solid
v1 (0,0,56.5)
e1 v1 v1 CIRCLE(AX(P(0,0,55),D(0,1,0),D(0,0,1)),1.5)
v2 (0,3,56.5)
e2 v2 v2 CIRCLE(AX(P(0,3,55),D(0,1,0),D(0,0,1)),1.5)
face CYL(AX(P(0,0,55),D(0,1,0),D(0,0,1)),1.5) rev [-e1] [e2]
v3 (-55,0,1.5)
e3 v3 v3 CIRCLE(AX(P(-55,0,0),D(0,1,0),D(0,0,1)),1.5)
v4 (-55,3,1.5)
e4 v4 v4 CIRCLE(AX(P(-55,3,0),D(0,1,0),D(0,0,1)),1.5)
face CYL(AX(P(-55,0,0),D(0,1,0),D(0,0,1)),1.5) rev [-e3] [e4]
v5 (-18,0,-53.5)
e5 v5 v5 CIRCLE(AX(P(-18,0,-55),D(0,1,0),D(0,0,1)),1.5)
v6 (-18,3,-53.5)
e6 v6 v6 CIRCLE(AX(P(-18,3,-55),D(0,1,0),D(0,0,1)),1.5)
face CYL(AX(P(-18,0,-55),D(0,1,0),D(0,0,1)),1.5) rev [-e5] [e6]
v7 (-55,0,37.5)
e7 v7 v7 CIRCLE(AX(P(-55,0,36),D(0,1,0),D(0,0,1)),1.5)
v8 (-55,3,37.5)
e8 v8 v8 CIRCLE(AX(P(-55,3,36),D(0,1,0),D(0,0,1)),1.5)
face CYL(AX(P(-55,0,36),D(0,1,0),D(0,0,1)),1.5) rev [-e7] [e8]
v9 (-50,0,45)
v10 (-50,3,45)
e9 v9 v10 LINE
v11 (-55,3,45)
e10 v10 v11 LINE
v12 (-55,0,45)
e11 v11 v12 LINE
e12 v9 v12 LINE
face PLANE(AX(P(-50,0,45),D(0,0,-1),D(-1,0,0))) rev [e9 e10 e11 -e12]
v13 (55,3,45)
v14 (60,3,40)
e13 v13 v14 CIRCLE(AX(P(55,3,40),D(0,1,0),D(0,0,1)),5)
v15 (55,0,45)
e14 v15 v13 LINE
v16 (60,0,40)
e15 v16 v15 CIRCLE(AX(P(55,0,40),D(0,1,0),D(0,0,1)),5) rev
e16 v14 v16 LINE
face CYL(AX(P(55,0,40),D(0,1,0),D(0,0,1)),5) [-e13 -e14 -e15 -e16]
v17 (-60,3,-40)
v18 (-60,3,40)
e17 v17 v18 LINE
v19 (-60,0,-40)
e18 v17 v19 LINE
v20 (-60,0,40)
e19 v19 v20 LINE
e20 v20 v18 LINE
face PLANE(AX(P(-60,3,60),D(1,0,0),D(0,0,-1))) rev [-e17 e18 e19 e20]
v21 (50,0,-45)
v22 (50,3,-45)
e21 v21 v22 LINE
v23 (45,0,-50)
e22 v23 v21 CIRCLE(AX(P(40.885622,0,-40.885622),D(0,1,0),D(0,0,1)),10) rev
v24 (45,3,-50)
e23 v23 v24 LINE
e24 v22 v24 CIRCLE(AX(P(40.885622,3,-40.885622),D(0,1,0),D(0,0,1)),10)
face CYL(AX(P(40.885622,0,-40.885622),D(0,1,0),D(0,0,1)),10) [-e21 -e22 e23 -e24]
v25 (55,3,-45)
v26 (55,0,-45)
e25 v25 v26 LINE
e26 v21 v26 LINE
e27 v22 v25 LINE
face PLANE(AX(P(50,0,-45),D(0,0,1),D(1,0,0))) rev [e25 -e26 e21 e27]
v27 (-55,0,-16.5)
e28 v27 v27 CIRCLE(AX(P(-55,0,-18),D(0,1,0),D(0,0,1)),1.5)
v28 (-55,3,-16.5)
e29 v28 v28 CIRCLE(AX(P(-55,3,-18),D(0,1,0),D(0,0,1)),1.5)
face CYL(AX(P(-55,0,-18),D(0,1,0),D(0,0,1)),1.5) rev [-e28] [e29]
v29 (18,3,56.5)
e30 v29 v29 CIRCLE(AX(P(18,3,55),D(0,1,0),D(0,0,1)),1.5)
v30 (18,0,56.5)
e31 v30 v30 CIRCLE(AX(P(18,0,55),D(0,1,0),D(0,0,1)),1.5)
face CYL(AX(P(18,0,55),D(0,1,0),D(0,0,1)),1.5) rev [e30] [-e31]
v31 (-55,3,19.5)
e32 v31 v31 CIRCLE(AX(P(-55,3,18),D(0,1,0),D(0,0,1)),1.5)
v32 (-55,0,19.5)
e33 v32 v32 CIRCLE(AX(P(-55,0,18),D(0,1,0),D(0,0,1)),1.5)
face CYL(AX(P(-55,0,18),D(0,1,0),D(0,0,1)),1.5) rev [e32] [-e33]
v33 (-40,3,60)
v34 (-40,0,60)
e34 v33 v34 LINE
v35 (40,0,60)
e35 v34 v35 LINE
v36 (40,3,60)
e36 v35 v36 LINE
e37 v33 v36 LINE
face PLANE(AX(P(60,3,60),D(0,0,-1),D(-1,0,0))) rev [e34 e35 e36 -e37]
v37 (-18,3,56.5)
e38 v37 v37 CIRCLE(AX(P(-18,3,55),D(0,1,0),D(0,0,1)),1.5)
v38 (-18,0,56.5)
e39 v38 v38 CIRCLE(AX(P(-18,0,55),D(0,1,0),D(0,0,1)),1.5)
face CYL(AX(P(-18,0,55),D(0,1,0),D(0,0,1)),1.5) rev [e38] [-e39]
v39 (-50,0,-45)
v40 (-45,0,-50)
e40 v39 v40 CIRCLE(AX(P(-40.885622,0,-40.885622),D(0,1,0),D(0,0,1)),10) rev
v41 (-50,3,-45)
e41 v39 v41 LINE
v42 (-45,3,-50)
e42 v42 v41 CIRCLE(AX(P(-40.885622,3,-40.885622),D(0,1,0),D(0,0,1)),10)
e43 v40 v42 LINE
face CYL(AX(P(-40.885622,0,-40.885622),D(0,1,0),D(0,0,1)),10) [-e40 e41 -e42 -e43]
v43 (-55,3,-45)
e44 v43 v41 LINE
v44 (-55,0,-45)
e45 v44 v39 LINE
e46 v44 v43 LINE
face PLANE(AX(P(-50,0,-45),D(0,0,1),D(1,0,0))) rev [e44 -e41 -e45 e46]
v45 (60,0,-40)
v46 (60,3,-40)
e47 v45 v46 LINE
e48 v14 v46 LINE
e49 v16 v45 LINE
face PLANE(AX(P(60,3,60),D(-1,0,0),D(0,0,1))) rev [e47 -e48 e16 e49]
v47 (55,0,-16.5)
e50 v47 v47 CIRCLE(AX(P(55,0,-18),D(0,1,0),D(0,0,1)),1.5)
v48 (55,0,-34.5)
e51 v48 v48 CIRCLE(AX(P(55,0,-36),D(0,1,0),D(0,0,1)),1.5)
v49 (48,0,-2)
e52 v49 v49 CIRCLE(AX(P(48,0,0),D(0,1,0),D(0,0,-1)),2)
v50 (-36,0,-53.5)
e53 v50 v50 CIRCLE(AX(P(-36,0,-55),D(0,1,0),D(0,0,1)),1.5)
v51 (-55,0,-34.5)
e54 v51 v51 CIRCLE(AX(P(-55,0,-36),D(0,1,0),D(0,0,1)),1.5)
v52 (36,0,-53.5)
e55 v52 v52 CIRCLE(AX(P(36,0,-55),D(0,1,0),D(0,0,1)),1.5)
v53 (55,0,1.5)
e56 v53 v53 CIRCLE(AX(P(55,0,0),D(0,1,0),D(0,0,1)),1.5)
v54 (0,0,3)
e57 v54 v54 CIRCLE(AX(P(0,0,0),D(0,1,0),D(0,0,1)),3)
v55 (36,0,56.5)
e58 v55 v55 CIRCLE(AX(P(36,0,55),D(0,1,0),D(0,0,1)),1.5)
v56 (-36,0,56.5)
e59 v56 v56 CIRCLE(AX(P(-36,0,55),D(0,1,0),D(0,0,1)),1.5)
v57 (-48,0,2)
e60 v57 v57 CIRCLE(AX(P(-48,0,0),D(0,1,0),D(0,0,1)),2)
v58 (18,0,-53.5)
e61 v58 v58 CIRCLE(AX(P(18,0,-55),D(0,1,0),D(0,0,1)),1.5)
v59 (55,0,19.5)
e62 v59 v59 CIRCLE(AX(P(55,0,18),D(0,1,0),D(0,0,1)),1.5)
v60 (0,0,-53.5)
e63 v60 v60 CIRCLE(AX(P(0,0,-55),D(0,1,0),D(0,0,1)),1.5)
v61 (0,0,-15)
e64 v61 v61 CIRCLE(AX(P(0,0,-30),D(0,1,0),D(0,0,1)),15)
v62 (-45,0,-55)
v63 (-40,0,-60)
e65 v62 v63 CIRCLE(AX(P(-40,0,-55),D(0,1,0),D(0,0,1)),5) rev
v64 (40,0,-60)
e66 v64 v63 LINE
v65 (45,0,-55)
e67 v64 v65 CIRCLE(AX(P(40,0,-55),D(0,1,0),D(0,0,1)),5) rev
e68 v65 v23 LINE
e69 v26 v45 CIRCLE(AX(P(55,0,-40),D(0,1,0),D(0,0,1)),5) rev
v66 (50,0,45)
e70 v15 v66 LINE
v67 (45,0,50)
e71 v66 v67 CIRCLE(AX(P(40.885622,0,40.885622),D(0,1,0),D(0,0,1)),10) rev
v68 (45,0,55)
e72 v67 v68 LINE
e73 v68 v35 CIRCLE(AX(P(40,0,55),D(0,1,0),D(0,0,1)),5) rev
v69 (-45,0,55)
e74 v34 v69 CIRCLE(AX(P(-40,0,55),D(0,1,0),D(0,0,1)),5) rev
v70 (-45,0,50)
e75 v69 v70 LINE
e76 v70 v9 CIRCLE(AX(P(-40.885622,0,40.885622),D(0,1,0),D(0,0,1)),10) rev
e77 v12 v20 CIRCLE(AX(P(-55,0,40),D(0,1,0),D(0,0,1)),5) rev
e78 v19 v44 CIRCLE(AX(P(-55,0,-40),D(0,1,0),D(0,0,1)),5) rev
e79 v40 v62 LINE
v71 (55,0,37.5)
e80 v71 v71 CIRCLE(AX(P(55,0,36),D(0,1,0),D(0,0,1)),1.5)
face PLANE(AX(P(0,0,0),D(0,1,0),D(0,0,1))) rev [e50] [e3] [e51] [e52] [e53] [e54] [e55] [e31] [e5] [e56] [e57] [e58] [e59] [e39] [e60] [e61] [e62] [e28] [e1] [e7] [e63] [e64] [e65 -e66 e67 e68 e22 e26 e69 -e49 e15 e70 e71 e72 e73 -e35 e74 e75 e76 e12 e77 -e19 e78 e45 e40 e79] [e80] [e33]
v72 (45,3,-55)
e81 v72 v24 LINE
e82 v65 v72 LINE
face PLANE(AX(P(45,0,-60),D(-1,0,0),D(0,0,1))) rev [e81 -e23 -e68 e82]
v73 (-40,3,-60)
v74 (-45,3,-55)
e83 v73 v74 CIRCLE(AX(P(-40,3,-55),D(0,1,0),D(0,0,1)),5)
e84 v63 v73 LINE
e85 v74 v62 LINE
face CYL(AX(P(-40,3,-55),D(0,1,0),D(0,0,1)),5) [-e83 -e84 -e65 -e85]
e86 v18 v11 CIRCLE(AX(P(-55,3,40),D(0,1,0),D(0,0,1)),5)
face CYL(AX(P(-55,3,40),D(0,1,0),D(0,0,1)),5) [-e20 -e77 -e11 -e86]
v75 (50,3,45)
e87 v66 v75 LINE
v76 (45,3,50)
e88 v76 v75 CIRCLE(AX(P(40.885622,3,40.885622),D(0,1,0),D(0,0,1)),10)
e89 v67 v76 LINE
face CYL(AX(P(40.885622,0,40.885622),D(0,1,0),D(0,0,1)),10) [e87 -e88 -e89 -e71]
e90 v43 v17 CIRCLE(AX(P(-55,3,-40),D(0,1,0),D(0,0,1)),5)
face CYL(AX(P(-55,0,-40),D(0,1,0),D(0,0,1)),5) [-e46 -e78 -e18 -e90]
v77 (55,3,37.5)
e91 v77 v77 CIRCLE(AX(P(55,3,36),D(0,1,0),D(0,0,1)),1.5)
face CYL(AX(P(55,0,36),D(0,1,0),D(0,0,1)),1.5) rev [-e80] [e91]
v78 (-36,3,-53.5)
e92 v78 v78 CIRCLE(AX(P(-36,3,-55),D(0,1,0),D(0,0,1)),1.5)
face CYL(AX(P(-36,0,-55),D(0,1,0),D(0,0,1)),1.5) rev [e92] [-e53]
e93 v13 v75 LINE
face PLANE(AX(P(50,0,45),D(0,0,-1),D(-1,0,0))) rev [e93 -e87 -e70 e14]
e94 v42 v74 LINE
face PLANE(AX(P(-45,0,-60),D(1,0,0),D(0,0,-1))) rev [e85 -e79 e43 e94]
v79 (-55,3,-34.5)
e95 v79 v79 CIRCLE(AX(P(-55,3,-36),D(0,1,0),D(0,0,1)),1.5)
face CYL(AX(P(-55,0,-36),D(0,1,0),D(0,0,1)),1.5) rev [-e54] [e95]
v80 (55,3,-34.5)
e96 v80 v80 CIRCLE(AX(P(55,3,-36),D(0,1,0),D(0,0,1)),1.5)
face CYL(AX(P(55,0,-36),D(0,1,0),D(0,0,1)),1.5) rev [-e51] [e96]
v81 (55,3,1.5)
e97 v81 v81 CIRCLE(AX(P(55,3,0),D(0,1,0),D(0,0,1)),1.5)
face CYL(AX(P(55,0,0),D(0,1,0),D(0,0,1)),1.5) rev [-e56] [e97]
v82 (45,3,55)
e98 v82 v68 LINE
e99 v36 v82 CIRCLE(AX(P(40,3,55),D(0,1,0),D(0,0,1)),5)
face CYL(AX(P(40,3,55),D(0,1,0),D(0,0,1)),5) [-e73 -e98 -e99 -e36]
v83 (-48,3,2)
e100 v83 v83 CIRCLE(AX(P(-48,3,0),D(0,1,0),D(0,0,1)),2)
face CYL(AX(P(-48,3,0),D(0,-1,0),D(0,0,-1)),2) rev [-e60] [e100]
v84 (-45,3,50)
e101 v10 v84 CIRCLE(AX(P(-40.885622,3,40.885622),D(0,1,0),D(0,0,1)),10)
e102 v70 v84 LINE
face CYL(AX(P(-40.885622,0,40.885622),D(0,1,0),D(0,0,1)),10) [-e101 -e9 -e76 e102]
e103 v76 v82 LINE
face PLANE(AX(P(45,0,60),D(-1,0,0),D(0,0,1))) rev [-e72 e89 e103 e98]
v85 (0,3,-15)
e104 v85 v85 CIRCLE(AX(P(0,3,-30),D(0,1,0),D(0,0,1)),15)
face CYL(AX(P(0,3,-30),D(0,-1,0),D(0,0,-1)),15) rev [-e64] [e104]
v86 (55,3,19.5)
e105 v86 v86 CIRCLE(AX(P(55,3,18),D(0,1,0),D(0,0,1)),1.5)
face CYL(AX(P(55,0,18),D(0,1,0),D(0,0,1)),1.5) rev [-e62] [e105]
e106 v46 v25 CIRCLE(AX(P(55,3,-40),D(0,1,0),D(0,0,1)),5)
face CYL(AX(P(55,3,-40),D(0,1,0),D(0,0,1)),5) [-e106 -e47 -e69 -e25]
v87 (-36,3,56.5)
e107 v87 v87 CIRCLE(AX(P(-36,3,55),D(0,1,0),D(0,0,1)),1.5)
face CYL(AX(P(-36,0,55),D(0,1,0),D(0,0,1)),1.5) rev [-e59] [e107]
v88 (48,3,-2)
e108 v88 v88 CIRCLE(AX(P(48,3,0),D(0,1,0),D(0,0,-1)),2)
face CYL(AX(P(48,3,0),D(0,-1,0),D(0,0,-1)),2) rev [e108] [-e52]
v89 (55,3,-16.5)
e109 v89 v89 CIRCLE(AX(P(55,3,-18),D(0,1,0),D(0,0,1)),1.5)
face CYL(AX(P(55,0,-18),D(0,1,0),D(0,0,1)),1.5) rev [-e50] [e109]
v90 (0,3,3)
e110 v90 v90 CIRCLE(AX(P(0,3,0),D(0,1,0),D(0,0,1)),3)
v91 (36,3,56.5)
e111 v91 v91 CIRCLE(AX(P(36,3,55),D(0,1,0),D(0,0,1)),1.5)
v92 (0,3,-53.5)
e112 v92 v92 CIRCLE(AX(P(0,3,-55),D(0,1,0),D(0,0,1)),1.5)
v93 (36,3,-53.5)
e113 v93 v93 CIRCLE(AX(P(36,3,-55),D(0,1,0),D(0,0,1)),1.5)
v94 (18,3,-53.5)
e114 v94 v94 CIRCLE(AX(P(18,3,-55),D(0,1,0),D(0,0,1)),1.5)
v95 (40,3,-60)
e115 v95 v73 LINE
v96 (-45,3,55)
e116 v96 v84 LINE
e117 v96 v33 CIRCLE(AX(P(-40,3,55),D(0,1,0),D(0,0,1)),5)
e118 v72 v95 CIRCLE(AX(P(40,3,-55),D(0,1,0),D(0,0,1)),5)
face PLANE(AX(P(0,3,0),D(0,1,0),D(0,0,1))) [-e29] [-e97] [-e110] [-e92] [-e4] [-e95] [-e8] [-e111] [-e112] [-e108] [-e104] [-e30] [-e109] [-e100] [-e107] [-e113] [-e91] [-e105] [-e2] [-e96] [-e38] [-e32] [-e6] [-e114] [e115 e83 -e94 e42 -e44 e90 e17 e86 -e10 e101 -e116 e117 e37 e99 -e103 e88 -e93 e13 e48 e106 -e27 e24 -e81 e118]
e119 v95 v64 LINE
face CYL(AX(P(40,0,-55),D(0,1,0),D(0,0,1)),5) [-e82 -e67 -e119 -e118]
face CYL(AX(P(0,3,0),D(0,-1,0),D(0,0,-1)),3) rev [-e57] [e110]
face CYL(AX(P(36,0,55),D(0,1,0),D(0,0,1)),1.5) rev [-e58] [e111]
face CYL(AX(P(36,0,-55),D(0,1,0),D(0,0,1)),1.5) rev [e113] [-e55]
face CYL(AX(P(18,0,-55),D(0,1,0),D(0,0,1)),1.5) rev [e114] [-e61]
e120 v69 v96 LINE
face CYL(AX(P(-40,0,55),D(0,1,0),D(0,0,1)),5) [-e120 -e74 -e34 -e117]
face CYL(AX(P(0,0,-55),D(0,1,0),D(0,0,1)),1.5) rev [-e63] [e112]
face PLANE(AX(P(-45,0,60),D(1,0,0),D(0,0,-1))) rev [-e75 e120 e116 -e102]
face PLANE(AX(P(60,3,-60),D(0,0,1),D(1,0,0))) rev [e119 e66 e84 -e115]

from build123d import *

# Parameters (mm, degrees)
SKETCH_1_W          = 120
SKETCH_1_H          = 120
SKETCH_1_R          = 3
SKETCH_1_R_2        = 2
SKETCH_1_R_3        = 15
EXTRUDE_1_DEPTH     = 3
CUT_EXTRUDE_1_DEPTH = 85.905830189
FILLET_1_R          = 10
FILLET_2_R          = 5
SKETCH_4_R          = 1.5
CUT_EXTRUDE_2_DEPTH = 85.905830189


with BuildPart() as part:
    # Эскиз1 → Бобышка-Вытянуть1 (new body)
    with BuildSketch(Plane(origin=(0, 0, 0), x_dir=(1, 0, 0), z_dir=(0, 1, 0))):
        Rectangle(SKETCH_1_W, SKETCH_1_H)
        with Locations(Location((0, 0, 0), (0, 0, 270))):
            Circle(SKETCH_1_R, mode=Mode.SUBTRACT)
        with Locations(Location((-48, 0, 0), (0, 0, 270))):
            Circle(SKETCH_1_R_2, mode=Mode.SUBTRACT)
        with Locations(Location((48, 0, 0), (0, 0, 90))):
            Circle(SKETCH_1_R_2, mode=Mode.SUBTRACT)
        with Locations(Location((0, 30, 0), (0, 0, 270))):
            Circle(SKETCH_1_R_3, mode=Mode.SUBTRACT)
    extrude(amount=EXTRUDE_1_DEPTH)

    # Эскиз3 → Вырез-Вытянуть1 (cut, through all)
    with BuildSketch(Plane(origin=(0, 3, 0), x_dir=(1, 0, 0), z_dir=(0, 1, 0))):
        Polygon((-60, 60), (-45, 60), (-45, 50), (-50, 50), (-50, 45), (-60, 45), align=None)
        Polygon((60, 45), (60, 60), (45, 60), (45, 50), (50, 50), (50, 45), align=None)
        Polygon((60, -60), (45, -60), (45, -50), (50, -50), (50, -45), (60, -45), align=None)
        Polygon((-60, -45), (-60, -60), (-45, -60), (-45, -50), (-50, -50), (-50, -45), align=None)
    extrude(amount=-CUT_EXTRUDE_1_DEPTH, mode=Mode.SUBTRACT)

    # Скругление1
    # the kernel refuses this fillet: 10 mm, written as the material it takes off along each edge
    with BuildSketch(Plane(origin=(50, 15.5, -50), x_dir=(0, 0, 1), z_dir=(0, -1, 0)), Plane(origin=(50, 15.5, 50), x_dir=(-1, 0, 0), z_dir=(0, -1, 0)), Plane(origin=(-50, 15.5, 50), x_dir=(0, 0, -1), z_dir=(0, -1, 0)), Plane(origin=(-50, 15.5, -50), x_dir=(1, 0, 0), z_dir=(0, -1, 0))) as fillet_1_piece_1:
        with BuildLine():
            CenterArc((9.114378278, 9.114378278), FILLET_1_R, 204.295188945, 41.409622109)
            Line((0, 5), (0, 0))
            Line((0, 0), (5, 0))
        make_face()
    extrude(amount=28, mode=Mode.SUBTRACT)

    # Скругление2
    fillet_2_edges = [part.edges().sort_by_distance(p)[0] for p in [
        (-60, 1.5, 45),
        (-45, 1.5, 60),
        (60, 1.5, 45),
        (45, 1.5, 60),
        (60, 1.5, -45),
        (45, 1.5, -60),
        (-60, 1.5, -45),
        (-45, 1.5, -60),
    ]]
    fillet(fillet_2_edges, radius=FILLET_2_R)

    # Эскиз4 → Вырез-Вытянуть2 (cut, through all)
    with BuildSketch(Plane(origin=(0, 3, 0), x_dir=(1, 0, 0), z_dir=(0, 1, 0))):
        with Locations(Location((0, 55, 0), (0, 0, 270))):
            Circle(SKETCH_4_R)
        with Locations(Location((18, 55, 0), (0, 0, 270))):
            Circle(SKETCH_4_R)
        with Locations(Location((36, 55, 0), (0, 0, 270))):
            Circle(SKETCH_4_R)
        with Locations(Location((-18, 55, 0), (0, 0, 270))):
            Circle(SKETCH_4_R)
        with Locations(Location((-36, 55, 0), (0, 0, 270))):
            Circle(SKETCH_4_R)
        with Locations(Location((55, 0, 0), (0, 0, 270))):
            Circle(SKETCH_4_R)
        with Locations(Location((55, -18, 0), (0, 0, 270))):
            Circle(SKETCH_4_R)
        with Locations(Location((55, -36, 0), (0, 0, 270))):
            Circle(SKETCH_4_R)
        with Locations(Location((55, 18, 0), (0, 0, 270))):
            Circle(SKETCH_4_R)
        with Locations(Location((55, 36, 0), (0, 0, 270))):
            Circle(SKETCH_4_R)
        with Locations(Location((0, -55, 0), (0, 0, 270))):
            Circle(SKETCH_4_R)
        with Locations(Location((-18, -55, 0), (0, 0, 270))):
            Circle(SKETCH_4_R)
        with Locations(Location((-36, -55, 0), (0, 0, 270))):
            Circle(SKETCH_4_R)
        with Locations(Location((18, -55, 0), (0, 0, 270))):
            Circle(SKETCH_4_R)
        with Locations(Location((36, -55, 0), (0, 0, 270))):
            Circle(SKETCH_4_R)
        with Locations(Location((-55, 0, 0), (0, 0, 270))):
            Circle(SKETCH_4_R)
        with Locations(Location((-55, 18, 0), (0, 0, 270))):
            Circle(SKETCH_4_R)
        with Locations(Location((-55, 36, 0), (0, 0, 270))):
            Circle(SKETCH_4_R)
        with Locations(Location((-55, -18, 0), (0, 0, 270))):
            Circle(SKETCH_4_R)
        with Locations(Location((-55, -36, 0), (0, 0, 270))):
            Circle(SKETCH_4_R)
    extrude(amount=-CUT_EXTRUDE_2_DEPTH, mode=Mode.SUBTRACT)


solid = part.part
